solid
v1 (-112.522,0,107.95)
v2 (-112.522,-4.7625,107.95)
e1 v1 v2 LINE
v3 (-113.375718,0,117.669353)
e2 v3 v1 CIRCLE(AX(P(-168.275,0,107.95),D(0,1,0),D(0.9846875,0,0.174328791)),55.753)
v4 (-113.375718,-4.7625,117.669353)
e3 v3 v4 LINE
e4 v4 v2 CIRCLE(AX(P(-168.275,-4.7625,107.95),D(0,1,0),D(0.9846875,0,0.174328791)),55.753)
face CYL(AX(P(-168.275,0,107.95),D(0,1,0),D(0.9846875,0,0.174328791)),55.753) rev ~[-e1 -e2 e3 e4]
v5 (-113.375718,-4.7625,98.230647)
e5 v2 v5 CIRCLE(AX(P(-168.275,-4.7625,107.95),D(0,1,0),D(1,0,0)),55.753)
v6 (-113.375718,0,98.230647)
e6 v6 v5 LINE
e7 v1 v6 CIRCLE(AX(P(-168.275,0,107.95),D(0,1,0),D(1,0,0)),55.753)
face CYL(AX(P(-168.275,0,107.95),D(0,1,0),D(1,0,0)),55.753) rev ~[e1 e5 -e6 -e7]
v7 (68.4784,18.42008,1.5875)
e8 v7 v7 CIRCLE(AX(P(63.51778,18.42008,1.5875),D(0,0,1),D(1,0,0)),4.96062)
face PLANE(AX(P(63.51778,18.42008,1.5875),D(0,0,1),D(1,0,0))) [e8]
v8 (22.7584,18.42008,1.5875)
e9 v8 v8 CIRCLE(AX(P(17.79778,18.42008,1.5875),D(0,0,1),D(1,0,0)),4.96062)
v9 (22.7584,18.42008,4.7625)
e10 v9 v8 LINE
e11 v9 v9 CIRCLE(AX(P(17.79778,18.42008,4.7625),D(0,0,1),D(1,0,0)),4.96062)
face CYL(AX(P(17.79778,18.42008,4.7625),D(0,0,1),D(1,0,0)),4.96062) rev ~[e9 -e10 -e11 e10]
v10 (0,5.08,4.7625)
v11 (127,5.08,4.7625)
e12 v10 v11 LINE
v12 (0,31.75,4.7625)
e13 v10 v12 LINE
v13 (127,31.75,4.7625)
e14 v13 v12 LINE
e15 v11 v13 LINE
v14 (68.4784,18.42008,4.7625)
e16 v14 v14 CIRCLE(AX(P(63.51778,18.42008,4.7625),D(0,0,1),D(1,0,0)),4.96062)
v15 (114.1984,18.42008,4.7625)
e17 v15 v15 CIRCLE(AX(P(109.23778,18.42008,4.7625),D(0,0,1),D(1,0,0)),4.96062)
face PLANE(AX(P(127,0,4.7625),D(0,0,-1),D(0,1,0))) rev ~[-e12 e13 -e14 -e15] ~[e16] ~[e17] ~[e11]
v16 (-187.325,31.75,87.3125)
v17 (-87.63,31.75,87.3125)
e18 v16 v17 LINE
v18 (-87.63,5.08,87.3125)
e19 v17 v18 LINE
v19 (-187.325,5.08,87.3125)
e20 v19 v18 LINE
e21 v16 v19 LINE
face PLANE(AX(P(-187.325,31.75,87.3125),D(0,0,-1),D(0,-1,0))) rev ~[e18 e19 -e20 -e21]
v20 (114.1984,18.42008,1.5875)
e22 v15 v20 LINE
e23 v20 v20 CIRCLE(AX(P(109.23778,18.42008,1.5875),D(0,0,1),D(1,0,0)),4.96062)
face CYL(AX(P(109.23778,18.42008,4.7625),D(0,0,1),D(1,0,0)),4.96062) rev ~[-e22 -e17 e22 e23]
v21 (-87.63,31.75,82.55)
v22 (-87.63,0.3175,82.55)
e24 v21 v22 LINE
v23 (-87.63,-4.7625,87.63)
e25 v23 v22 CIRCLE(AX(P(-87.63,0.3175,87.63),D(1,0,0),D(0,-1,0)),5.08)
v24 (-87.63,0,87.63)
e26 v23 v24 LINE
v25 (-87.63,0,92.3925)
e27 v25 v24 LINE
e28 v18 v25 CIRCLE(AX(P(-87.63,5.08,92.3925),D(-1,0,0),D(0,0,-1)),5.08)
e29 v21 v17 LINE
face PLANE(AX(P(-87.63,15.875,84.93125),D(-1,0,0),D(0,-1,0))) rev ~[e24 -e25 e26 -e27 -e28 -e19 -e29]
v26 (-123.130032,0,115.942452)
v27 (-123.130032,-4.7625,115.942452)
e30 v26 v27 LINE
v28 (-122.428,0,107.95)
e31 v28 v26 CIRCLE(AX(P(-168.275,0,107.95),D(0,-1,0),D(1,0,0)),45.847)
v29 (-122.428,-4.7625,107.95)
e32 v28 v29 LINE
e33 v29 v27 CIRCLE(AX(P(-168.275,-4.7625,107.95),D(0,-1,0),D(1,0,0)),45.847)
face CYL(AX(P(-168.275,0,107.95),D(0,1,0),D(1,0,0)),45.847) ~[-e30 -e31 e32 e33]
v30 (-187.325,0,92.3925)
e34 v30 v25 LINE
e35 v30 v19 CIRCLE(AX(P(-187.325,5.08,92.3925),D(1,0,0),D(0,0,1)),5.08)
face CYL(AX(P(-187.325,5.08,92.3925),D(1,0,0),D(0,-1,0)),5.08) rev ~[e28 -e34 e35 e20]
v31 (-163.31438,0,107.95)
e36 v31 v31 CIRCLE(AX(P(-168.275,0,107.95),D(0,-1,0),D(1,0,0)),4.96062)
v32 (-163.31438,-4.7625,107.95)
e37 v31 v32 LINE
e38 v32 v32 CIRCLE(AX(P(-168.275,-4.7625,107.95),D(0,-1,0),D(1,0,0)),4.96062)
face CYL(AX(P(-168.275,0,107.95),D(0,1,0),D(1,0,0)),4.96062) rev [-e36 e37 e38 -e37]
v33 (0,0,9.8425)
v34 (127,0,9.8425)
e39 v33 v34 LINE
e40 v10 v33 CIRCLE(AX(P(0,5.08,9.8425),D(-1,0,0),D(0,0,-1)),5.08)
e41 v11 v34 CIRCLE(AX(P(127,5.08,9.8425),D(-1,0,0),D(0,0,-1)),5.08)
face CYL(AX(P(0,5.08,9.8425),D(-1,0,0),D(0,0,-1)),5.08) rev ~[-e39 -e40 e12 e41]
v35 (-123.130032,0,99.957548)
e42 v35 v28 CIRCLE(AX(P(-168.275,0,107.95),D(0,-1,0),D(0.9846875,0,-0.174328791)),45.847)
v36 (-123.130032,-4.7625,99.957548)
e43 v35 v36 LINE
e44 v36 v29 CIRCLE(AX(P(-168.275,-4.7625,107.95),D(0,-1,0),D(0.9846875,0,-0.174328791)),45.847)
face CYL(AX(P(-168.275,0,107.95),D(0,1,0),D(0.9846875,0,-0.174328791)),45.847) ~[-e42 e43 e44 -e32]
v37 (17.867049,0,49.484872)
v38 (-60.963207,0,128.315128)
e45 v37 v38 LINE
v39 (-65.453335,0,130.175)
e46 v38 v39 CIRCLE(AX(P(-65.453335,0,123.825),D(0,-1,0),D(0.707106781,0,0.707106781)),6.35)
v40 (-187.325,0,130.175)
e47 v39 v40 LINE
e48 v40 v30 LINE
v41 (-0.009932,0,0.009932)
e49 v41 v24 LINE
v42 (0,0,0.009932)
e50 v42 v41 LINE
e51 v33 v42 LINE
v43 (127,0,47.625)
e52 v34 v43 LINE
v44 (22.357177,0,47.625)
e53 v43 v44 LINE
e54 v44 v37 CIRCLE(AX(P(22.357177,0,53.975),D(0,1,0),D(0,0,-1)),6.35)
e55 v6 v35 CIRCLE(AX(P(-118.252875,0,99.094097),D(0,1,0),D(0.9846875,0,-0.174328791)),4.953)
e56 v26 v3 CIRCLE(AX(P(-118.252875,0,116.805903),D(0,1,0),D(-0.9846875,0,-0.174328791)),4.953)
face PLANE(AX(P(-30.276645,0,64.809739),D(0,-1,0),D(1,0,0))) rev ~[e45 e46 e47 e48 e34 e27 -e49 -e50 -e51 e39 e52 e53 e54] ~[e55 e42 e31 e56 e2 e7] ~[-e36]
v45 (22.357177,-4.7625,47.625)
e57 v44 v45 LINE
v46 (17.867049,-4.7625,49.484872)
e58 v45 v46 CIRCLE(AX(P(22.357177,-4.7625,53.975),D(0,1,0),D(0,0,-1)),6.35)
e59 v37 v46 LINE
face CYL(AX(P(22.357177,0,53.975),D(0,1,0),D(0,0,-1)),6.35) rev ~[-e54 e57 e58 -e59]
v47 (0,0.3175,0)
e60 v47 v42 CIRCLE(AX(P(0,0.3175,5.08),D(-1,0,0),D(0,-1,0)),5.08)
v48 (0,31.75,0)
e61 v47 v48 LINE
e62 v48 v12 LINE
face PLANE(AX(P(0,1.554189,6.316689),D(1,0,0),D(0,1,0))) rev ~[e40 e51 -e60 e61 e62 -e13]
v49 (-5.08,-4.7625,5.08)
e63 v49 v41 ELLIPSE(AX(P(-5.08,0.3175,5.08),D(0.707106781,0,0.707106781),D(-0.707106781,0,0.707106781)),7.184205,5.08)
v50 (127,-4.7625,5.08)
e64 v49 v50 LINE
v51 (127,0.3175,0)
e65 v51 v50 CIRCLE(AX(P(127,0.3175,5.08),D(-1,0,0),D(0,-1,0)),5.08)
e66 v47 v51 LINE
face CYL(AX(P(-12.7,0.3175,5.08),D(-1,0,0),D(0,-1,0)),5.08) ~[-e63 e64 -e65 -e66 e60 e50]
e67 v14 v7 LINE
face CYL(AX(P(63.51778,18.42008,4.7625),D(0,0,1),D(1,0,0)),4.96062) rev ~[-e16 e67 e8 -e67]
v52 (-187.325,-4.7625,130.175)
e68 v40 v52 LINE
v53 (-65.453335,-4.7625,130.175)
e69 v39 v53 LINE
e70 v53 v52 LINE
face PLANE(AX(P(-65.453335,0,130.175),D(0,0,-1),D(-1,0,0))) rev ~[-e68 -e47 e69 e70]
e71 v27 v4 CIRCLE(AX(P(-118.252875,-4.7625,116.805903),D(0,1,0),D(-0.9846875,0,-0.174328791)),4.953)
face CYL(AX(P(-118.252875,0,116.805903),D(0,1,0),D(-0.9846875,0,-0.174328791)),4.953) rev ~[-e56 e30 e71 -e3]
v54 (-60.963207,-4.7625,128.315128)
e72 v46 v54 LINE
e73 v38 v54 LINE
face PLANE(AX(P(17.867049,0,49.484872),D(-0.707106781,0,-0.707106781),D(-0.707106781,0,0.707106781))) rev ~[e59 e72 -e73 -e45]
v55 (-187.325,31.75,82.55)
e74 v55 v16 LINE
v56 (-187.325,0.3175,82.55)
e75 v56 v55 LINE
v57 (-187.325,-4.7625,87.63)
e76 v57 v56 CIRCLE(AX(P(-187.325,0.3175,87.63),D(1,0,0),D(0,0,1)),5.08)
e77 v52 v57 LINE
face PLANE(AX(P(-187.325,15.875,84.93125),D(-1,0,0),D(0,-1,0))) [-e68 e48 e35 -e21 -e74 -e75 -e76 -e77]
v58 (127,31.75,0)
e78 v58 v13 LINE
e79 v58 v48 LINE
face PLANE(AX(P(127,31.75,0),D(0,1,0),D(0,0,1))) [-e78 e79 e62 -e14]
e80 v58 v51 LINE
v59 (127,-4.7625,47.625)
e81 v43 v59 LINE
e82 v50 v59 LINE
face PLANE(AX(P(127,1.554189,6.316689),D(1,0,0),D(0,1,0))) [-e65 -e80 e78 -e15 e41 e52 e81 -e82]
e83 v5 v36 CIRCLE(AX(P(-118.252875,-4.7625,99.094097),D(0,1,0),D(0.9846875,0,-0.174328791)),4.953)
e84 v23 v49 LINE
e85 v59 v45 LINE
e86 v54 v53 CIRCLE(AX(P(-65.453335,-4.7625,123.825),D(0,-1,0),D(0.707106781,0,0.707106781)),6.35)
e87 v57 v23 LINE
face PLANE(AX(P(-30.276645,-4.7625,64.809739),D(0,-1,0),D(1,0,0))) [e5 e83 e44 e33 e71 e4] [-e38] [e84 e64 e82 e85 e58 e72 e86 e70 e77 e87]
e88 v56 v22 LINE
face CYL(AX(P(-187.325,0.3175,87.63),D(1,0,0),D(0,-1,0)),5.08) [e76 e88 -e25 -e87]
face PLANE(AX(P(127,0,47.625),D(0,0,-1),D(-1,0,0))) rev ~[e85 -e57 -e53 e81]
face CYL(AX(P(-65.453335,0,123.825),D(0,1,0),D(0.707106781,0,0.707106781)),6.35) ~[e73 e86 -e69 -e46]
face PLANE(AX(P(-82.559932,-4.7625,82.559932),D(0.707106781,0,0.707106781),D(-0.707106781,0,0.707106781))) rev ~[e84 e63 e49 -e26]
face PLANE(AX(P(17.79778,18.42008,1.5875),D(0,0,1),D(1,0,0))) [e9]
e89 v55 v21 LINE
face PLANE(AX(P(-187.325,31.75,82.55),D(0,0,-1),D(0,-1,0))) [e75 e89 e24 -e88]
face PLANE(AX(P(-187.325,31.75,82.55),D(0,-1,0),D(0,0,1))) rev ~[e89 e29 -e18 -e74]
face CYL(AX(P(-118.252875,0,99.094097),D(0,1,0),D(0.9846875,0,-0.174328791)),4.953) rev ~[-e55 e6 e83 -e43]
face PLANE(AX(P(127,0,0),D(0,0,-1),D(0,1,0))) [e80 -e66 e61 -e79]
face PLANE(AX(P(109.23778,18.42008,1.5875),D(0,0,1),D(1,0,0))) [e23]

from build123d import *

# Parameters (mm, degrees)
F0_R        = 4.96062
F1_DEPTH    = 4.7625
F2_W        = 31.75
F2_H        = 4.7625
F3_DEPTH    = 127
F4_T1_DEPTH = 127
F4_T3_DEPTH = 152.4
F5_R        = 4.96062
F6_DEPTH    = 3.175
F7_W        = 31.75
F7_H        = 4.7625
F8_DEPTH    = 99.695
F9_R        = 5.08
F11_DEPTH   = 25.4


# Not quite as in the source:
# - a fillet or chamfer that OpenCascade refuses, or shapes differently, is made with other operations: its cross-section is extruded or revolved along the edge and cut away or added


with BuildPart() as f1:
    # F0 (on Front) → F1 (new body)
    with BuildSketch(Plane.XZ):
        with BuildLine():
            Line((-82.55, 82.55), (0, 0))
            Line((0, 0), (127, 0))
            Line((127, 0), (127, 47.625))
            Line((127, 47.625), (22.3571770291, 47.625))
            ThreePointArc((22.3571770291, 47.625), (19.9271372336, 48.1083649686), (17.8670489686, 49.4848719395))
            Line((17.8670489686, 49.4848719395), (-60.9632071525, 128.3151280605))
            ThreePointArc((-60.9632071525, 128.3151280605), (-63.0232954175, 129.6916350314), (-65.4533352131, 130.175))
            Line((-65.4533352131, 130.175), (-187.325, 130.175))
            Line((-187.325, 130.175), (-187.325, 82.55))
            Line((-187.325, 82.55), (-82.55, 82.55))
        make_face()
        with Locations((-168.275, 107.95)):
            Circle(F0_R, mode=Mode.SUBTRACT)
        with BuildLine():
            ThreePointArc((-113.3757178125, 117.6693530802), (-112.7358395418, 112.8283875), (-112.522, 107.95))
            ThreePointArc((-112.522, 107.95), (-112.7358395418, 103.0716125), (-113.3757178125, 98.2306469198))
            ThreePointArc((-113.3757178125, 98.2306469198), (-119.1163255014, 94.2169402337), (-123.1300321875, 99.9575479227))
            ThreePointArc((-123.1300321875, 99.9575479227), (-122.6038452724, 103.9383875), (-122.428, 107.95))
            ThreePointArc((-122.428, 107.95), (-122.6038452724, 111.9616125), (-123.1300321875, 115.9424520773))
            ThreePointArc((-123.1300321875, 115.9424520773), (-119.1163255014, 121.6830597663), (-113.3757178125, 117.6693530802))
        make_face(mode=Mode.SUBTRACT)
    extrude(amount=F1_DEPTH)

    # F2 (on face) → F3 (join)
    with BuildSketch(Plane.YZ.offset(127)):
        with Locations((15.875, 2.38125)):
            Rectangle(F2_W, F2_H)
    extrude(amount=-F3_DEPTH)

    # F4: fillet of radius 5.08 on 2 edges, made by hand

    # F4_s2 → F4_t1 (join)
    with BuildSketch(Plane.YZ):
        with BuildLine():
            ThreePointArc((5.08, 4.7625), (1.4878975516, 6.2503975516), (0, 9.8425))
            Line((0, 9.8425), (0, 4.7625))
            Line((0, 4.7625), (5.08, 4.7625))
        make_face()
    extrude(amount=F4_T1_DEPTH)

    # F4_s4 → F4_t3 (cut)
    with BuildSketch(Plane.YZ.offset(-12.7)):
        with BuildLine():
            ThreePointArc((-4.7625, 5.08), (-3.2746024484, 1.4878975516), (0.3175, 0))
            Line((0.3175, 0), (-4.7625, 0))
            Line((-4.7625, 0), (-4.7625, 5.08))
        make_face()
    extrude(amount=F4_T3_DEPTH, mode=Mode.SUBTRACT)

    # F5 (on face) → F6 (cut)
    with BuildSketch(Plane.XY.offset(4.7625)):
        with Locations((17.79778, 18.42008)):
            Circle(F5_R)
        with Locations((63.51778, 18.42008)):
            Circle(F5_R)
        with Locations((109.23778, 18.42008)):
            Circle(F5_R)
    extrude(amount=-F6_DEPTH, mode=Mode.SUBTRACT)

    # F7 (on face) → F8 (join)
    with BuildSketch(Plane(origin=(-187.325, 0, 0), x_dir=(0, -1, 0), z_dir=(-1, 0, 0))):
        with Locations((-15.875, 84.93125)):
            Rectangle(F7_W, F7_H)
    extrude(amount=-F8_DEPTH)

    # F9
    f9_edges = [f1.edges().sort_by_distance(p)[0] for p in [
        (-134.9375, -4.7625, 82.55),
        (-137.4775, 0, 87.3125),
    ]]
    fillet(f9_edges, radius=F9_R)

    # F10 (on face) → F11 (cut)
    with BuildSketch(Plane.XZ.offset(4.7625)):
        Polygon((-82.5599315833, 82.5599315833), (-87.63, 87.63), (-87.63, 82.5599315833), align=None)
    extrude(amount=-F11_DEPTH, mode=Mode.SUBTRACT)


solid = f1.part
